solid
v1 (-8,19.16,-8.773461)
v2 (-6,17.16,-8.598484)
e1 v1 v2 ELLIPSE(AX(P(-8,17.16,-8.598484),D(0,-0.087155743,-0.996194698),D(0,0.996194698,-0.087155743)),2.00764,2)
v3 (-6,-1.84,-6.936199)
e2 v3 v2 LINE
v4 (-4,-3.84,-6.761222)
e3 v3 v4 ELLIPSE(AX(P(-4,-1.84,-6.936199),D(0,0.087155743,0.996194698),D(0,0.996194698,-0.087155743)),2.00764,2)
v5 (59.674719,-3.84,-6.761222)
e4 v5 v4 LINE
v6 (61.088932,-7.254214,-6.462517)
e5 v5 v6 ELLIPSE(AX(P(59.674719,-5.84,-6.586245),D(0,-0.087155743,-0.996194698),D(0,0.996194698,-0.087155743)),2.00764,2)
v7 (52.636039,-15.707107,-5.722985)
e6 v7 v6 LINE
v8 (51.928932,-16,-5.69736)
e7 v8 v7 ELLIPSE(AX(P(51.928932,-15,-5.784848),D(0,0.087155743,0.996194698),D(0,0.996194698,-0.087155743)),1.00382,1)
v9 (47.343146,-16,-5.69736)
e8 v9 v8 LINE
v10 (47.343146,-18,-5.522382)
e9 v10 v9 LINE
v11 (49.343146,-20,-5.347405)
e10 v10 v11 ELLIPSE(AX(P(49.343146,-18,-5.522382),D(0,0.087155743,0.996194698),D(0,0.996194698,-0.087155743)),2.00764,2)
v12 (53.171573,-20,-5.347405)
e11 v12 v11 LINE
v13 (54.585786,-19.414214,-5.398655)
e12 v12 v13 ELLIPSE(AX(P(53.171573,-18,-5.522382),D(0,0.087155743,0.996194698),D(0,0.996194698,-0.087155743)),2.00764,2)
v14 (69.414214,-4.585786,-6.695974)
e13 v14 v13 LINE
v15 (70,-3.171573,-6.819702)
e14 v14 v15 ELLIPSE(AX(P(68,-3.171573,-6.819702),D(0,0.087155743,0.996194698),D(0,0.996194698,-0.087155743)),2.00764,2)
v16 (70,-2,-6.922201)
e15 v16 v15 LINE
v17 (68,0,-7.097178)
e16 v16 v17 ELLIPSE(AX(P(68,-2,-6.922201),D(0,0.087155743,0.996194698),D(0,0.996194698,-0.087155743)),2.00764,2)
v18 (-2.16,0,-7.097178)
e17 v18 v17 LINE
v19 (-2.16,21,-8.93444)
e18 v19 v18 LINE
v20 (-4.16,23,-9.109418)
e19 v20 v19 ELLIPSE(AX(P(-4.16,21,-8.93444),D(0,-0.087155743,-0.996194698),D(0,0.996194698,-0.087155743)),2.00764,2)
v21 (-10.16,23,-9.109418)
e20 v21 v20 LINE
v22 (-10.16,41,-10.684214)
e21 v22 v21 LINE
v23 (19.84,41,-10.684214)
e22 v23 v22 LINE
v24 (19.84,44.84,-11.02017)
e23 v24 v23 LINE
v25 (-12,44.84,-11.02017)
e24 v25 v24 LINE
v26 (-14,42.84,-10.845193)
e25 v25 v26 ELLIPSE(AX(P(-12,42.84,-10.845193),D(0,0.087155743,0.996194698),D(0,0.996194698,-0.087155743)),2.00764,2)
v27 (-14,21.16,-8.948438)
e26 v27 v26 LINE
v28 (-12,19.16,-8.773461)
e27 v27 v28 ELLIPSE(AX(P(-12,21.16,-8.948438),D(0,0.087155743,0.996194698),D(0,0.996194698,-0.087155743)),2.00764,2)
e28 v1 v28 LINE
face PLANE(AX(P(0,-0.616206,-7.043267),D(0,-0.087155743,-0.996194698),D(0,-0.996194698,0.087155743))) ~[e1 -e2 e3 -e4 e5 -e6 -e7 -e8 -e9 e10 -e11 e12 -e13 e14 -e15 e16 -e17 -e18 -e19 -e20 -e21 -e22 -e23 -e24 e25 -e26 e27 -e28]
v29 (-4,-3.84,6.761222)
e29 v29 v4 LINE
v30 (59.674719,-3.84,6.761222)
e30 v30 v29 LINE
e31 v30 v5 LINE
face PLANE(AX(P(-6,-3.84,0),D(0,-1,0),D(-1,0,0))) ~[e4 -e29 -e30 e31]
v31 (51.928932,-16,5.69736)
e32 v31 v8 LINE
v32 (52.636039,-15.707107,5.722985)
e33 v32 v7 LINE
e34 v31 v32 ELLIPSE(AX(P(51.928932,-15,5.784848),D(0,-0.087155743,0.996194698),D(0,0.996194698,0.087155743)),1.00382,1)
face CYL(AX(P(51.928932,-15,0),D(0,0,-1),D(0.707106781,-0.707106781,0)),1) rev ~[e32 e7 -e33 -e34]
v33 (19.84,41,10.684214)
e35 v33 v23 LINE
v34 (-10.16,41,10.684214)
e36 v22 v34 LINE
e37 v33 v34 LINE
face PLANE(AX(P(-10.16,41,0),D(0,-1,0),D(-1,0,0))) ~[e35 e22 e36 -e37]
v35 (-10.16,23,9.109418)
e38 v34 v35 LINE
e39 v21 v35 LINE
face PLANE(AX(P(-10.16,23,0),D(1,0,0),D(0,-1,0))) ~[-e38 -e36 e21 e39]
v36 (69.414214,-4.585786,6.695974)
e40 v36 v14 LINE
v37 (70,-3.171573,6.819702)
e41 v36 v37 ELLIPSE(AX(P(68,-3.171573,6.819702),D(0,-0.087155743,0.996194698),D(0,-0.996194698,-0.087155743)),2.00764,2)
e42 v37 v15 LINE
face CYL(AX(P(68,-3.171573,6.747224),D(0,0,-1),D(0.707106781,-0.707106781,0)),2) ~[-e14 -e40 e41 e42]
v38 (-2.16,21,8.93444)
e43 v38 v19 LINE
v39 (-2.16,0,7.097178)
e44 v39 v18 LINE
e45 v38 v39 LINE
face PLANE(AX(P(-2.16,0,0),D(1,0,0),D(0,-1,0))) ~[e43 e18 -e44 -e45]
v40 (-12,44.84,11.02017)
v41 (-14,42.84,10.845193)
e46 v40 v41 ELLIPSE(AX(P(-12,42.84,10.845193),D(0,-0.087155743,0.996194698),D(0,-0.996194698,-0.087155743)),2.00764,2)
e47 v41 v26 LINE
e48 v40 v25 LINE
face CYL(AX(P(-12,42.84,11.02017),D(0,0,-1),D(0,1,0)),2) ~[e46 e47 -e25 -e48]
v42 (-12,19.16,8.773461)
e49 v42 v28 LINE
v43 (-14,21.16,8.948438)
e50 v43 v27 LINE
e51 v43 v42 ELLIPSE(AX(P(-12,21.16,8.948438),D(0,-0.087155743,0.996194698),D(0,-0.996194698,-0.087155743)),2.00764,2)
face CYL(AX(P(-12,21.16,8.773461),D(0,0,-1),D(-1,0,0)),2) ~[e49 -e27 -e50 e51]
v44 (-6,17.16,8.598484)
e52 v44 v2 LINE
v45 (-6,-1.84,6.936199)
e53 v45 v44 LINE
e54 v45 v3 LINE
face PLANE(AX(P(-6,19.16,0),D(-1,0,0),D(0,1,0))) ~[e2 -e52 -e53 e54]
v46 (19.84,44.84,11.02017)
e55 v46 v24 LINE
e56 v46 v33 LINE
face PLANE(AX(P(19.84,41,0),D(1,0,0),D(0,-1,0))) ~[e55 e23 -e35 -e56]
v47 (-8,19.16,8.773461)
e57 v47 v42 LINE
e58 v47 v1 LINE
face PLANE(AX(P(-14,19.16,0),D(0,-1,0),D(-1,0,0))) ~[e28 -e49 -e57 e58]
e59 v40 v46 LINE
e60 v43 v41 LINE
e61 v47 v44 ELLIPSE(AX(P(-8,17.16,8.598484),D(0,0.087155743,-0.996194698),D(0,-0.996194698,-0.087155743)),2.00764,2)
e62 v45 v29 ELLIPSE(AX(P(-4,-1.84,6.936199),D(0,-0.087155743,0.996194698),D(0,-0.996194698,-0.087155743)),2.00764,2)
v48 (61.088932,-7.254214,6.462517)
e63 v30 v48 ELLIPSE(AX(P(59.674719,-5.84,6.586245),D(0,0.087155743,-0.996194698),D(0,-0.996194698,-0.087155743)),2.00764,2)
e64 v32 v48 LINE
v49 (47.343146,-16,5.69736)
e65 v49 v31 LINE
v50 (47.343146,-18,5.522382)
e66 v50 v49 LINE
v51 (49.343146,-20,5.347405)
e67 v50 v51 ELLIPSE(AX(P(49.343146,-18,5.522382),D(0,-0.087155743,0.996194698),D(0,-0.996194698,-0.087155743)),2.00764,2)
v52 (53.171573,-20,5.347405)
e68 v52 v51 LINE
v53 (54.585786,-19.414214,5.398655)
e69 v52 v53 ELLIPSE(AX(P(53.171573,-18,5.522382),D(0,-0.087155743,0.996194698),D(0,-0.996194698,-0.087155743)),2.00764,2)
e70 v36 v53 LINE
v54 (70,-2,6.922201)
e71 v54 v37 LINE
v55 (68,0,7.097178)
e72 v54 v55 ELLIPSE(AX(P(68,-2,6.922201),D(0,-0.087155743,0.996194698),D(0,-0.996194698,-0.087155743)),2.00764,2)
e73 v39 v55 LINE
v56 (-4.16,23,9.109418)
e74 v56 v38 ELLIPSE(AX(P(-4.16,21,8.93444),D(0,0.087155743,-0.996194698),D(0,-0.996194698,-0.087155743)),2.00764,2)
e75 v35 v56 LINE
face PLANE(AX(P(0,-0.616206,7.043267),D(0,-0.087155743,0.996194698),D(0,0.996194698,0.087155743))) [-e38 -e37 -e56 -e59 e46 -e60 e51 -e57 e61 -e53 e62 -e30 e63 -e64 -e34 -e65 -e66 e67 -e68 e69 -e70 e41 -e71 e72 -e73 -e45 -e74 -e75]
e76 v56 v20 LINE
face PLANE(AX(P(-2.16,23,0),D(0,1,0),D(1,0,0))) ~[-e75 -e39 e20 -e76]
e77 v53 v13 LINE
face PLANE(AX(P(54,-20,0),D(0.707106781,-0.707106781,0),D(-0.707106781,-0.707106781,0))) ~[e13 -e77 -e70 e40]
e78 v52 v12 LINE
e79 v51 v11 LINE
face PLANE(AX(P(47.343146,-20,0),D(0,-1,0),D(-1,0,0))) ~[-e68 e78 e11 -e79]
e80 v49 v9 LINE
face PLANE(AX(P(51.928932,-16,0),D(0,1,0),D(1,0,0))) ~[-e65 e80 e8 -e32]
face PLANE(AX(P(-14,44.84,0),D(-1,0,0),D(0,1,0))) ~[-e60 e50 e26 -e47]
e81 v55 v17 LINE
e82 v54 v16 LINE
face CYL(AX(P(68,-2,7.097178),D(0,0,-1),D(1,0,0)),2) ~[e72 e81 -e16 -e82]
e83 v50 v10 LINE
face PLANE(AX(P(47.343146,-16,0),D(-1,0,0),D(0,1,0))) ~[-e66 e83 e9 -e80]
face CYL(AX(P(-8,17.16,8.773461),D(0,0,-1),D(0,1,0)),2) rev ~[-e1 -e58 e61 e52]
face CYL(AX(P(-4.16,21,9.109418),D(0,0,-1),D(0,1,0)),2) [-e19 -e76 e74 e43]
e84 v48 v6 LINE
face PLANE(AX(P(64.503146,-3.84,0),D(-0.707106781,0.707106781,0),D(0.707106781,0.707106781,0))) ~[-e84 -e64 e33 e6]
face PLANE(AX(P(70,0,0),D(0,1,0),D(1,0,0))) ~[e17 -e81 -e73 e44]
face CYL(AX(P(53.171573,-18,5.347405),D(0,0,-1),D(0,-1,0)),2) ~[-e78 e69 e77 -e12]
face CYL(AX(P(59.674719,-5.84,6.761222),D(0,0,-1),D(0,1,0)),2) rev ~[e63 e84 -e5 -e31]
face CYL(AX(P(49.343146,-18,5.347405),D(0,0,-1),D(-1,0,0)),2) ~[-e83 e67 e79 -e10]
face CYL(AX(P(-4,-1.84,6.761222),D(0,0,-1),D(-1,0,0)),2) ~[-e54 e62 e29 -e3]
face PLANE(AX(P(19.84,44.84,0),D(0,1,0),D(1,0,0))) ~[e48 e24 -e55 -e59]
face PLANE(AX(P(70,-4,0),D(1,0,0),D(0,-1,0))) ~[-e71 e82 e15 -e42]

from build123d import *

# Parameters (mm, degrees)
F1_DEPTH = 30
F5_REACH = 130.7668048394
F6_DEPTH = 30
F8_R     = 2


# Not quite as in the source:
# - two fillets or chamfers of one size are made in one step


with BuildPart() as f1:
    # F0 (on Top) → F1 (new body, symmetric)
    with BuildSketch(Plane.XY):
        with BuildLine():
            Line((-2.159999702, 23), (-10.159999702, 23))
            Line((-10.159999702, 23), (-10.159999702, 41))
            Line((-10.159999702, 41), (19.840000298, 41))
            Line((19.840000298, 41), (19.840000298, 44.84))
            Line((19.840000298, 44.84), (-13.999999702, 44.84))
            Line((-13.999999702, 44.84), (-13.999999702, 19.16))
            Line((-13.999999702, 19.16), (-5.999999702, 19.16))
            Line((-5.999999702, 19.16), (-5.999999702, -3.84))
            Line((-5.999999702, -3.84), (64.5031457505, -3.84))
            Line((64.5031457505, -3.84), (52.6360389693, -15.7071067812))
            ThreePointArc((52.6360389693, -15.7071067812), (52.3116156205, -15.9238795325), (51.9289321881, -16))
            Line((51.9289321881, -16), (47.3431457505, -16))
            Line((47.3431457505, -16), (47.3431457505, -20))
            Line((47.3431457505, -20), (54, -20))
            Line((54, -20), (70, -4))
            Line((70, -4), (70, 0))
            Line((70, 0), (-2.159999702, 0))
            Line((-2.159999702, 0), (-2.159999702, 23))
        make_face()
    extrude(amount=F1_DEPTH, both=True)

    f5_end = Plane(origin=(0, -0.6162060448, 7.0432673219), x_dir=(0, 0.9961946981, 0.0871557427), z_dir=(0, -0.0871557427, 0.9961946981))
    # F1_face2 (on face) → F5 (cut, up to a plane its end follows)
    with BuildSketch(Plane(origin=(19.935386065, 10.6416249654, 30), x_dir=(1, 0, 0), z_dir=(0, 0, 1))):
        with BuildLine():
            Line((-22.095385767, -10.6416249654), (-22.095385767, 12.3583750346))
            Line((-22.095385767, 12.3583750346), (-30.095385767, 12.3583750346))
            Line((-30.095385767, 12.3583750346), (-30.095385767, 30.3583750346))
            Line((-30.095385767, 30.3583750346), (-0.095385767, 30.3583750346))
            Line((-0.095385767, 30.3583750346), (-0.095385767, 34.1983750346))
            Line((-0.095385767, 34.1983750346), (-33.935385767, 34.1983750346))
            Line((-33.935385767, 34.1983750346), (-33.935385767, 8.5183750346))
            Line((-33.935385767, 8.5183750346), (-25.935385767, 8.5183750346))
            Line((-25.935385767, 8.5183750346), (-25.935385767, -14.4816249654))
            Line((-25.935385767, -14.4816249654), (44.5677596855, -14.4816249654))
            Line((44.5677596855, -14.4816249654), (32.7006529043, -26.3487317465))
            ThreePointArc((32.7006529043, -26.3487317465), (32.3762295555, -26.5655044979), (31.9935461231, -26.6416249654))
            Line((31.9935461231, -26.6416249654), (27.4077596855, -26.6416249654))
            Line((27.4077596855, -26.6416249654), (27.4077596855, -30.6416249654))
            Line((27.4077596855, -30.6416249654), (34.064613935, -30.6416249654))
            Line((34.064613935, -30.6416249654), (50.064613935, -14.6416249654))
            Line((50.064613935, -14.6416249654), (50.064613935, -10.6416249654))
            Line((50.064613935, -10.6416249654), (-22.095385767, -10.6416249654))
        make_face()
    f5_long = extrude(amount=-F5_REACH, mode=Mode.PRIVATE)
    add(split(f5_long, bisect_by=f5_end, keep=Keep.TOP, mode=Mode.PRIVATE), mode=Mode.SUBTRACT)

    # F6 (cut, through all): a face of the model
    f6_faces = [f1.faces().sort_by_distance(p)[0] for p in [
        (-3.2211418013, 11.5, -30),
    ]]
    extrude(f6_faces, amount=-F6_DEPTH, mode=Mode.SUBTRACT)

    # F7: F1 across plane


with BuildPart() as f1_1:
    add(f1.part)
    add(f1.part.mirror(Plane.XY))

    # F8
    f8_edges = [f1_1.edges().sort_by_distance(p)[0] for p in [
        (70, 0, 0),
        (70, -4, 0),
        (54, -20, 0),
        (47.343146, -20, 0),
        (-2.16, 23, 0),
        (-14, 44.84, 0),
        (-14, 19.16, 0),
        (-6, 19.16, 0),
        (-6, -3.84, 0),
        (64.503146, -3.84, 0),
    ]]
    fillet(f8_edges, radius=F8_R)


solid = f1_1.part
